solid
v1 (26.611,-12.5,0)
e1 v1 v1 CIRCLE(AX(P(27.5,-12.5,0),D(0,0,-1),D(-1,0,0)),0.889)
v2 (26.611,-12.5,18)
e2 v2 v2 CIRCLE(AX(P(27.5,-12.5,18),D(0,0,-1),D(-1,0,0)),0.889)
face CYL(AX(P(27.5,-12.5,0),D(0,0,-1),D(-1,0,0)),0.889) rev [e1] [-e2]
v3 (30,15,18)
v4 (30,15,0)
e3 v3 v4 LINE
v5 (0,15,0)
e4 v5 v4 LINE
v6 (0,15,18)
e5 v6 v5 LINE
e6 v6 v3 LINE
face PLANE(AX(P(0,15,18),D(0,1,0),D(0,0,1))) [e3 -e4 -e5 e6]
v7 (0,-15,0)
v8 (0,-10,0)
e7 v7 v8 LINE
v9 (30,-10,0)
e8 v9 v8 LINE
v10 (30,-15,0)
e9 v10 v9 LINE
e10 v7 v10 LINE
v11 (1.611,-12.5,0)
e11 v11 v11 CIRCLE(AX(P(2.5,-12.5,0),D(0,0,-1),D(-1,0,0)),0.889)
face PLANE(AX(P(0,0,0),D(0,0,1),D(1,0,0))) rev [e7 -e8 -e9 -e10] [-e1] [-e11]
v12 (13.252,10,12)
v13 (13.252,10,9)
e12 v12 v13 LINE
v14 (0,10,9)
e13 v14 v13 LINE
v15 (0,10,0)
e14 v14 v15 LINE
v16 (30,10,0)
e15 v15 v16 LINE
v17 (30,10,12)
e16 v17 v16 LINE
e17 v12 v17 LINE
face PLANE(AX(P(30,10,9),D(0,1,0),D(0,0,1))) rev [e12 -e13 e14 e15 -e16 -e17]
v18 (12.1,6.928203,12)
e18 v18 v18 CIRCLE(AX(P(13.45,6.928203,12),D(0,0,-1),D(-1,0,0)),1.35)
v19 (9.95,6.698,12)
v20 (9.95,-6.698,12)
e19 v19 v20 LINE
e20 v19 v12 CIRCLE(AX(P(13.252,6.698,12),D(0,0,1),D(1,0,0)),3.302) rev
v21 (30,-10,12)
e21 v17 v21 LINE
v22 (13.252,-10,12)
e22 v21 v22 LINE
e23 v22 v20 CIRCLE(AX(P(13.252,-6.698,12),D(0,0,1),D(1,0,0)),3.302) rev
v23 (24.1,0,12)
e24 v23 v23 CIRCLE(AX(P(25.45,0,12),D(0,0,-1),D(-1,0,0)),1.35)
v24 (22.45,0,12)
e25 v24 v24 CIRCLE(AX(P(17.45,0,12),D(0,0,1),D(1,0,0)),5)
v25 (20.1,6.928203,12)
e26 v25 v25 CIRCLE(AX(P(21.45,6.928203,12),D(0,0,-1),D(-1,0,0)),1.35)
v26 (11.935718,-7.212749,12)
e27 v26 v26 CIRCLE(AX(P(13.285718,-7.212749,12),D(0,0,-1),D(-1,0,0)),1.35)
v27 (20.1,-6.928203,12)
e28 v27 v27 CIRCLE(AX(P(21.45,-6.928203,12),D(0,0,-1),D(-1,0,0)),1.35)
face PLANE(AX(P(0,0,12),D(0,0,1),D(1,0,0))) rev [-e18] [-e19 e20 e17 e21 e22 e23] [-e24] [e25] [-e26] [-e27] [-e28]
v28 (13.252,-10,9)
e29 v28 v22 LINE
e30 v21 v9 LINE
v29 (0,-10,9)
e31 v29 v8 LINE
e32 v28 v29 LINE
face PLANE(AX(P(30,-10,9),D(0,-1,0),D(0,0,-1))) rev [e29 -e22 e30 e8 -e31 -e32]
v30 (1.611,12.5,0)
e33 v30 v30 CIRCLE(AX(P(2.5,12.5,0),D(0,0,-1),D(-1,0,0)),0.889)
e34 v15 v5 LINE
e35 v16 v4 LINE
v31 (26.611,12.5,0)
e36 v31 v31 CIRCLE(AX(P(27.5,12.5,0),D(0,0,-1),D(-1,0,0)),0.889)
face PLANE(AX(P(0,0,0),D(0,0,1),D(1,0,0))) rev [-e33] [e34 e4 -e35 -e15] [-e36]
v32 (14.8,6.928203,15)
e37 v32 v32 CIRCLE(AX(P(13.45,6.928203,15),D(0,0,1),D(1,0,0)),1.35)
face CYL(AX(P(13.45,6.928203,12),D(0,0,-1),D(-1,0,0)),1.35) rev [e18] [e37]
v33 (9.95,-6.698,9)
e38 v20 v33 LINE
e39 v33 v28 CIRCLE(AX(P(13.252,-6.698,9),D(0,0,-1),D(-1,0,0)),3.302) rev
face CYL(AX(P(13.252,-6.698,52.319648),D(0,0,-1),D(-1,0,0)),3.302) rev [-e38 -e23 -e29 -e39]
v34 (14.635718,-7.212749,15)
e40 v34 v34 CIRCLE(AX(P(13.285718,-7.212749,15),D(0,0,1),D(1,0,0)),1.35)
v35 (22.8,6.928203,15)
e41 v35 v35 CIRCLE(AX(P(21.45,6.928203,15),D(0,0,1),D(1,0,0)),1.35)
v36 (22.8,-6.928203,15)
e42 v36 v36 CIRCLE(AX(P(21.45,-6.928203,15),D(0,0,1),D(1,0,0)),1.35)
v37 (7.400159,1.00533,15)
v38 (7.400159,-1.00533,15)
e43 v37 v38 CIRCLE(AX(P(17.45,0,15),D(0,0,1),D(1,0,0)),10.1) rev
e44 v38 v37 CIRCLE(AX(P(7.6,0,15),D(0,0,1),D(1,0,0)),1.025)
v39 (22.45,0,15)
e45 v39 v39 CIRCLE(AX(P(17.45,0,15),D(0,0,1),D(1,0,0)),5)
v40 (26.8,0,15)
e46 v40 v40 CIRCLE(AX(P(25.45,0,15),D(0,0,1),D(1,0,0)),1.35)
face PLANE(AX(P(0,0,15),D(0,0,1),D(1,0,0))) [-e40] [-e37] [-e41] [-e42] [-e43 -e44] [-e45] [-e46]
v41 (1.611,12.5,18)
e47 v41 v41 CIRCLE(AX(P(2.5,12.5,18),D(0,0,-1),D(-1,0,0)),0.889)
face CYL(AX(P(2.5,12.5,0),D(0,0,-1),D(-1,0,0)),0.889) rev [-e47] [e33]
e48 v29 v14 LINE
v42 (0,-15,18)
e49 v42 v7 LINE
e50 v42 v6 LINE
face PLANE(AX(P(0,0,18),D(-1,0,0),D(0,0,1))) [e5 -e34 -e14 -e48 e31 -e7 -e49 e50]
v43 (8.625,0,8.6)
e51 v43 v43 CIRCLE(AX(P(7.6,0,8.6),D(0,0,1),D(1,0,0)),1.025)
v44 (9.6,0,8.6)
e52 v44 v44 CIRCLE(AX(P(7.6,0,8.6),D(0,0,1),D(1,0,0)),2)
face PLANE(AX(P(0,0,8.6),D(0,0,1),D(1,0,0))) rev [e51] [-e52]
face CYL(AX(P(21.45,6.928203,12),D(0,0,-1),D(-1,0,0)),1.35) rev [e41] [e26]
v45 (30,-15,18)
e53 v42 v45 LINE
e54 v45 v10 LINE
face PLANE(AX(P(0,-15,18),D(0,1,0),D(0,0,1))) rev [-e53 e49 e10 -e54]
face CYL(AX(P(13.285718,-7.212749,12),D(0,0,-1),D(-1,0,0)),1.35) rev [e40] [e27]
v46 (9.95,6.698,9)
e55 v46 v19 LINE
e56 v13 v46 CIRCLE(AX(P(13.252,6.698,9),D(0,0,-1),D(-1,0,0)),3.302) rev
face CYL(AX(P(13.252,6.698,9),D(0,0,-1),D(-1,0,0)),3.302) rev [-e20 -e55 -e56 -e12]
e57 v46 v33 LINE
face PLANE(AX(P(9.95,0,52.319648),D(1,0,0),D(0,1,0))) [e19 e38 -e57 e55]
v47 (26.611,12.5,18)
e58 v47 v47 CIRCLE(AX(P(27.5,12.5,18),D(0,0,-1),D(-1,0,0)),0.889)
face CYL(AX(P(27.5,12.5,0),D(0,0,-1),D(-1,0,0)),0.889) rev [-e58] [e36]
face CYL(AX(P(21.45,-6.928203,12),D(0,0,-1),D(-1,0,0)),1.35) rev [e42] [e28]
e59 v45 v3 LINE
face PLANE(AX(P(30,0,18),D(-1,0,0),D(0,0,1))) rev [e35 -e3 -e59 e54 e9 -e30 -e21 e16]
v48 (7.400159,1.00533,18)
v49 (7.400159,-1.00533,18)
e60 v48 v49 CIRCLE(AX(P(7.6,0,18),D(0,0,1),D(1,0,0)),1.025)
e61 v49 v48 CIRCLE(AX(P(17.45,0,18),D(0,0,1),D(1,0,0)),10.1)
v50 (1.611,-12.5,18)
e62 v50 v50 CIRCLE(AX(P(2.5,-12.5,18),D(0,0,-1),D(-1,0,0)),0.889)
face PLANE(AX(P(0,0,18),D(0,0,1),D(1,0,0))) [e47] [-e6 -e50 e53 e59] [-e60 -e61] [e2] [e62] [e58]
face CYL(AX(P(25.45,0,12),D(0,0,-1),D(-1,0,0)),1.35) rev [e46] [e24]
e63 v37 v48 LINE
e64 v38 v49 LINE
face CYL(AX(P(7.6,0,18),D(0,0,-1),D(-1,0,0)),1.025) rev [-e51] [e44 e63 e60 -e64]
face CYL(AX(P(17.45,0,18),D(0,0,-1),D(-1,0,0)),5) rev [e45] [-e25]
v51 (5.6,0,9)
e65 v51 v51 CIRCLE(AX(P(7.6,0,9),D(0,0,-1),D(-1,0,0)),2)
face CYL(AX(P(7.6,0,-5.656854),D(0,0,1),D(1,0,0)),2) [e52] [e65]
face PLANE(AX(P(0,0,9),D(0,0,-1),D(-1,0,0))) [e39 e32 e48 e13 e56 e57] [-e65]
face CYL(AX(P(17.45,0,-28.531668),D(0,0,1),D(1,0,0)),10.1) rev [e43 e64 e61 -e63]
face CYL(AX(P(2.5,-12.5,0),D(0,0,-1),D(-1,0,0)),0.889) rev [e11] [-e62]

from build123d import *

# Parameters (mm, degrees)
SKETCH2_W              = 30
SKETCH2_H              = 30
SKETCH2_R              = 5
SKETCH2_R_2            = 1.025
BOSS_EXTRUDE1_DEPTH    = 18
SKETCH3_W              = 30
SKETCH3_H              = 20
CUT_EXTRUDE1_DEPTH     = 9
F_2_56_TAPPED_HOLE1_D  = 1.778
CUT_EXTRUDE2_START     = -3
SKETCH8_R              = 10.1
SKETCH8_R_2            = 5
SKETCH8_R_3            = 1.025
CUT_EXTRUDE2_DEPTH     = 3
BOSS_EXTRUDE2_START    = 0.4
SKETCH9_R              = 2
SKETCH9_R_2            = 1.025
BOSS_EXTRUDE2_DEPTH    = 0.4
SKETCH10_W             = 20.050000056
SKETCH10_H             = 20
CUT_EXTRUDE3_DEPTH     = 2.999999892
FILLET1_START          = 9
FILLET1_DEPTH          = 4
M2_5_CLEARANCE_HOLE1_D = 2.7


with BuildPart() as part:
    # Sketch2 → Boss-Extrude1 (new body)
    # profile 1 of 2: a face of its own
    with BuildSketch(Plane.XY):
        with Locations((15, 0)):
            Rectangle(SKETCH2_W, SKETCH2_H)
        with Locations((17.449999944, 0)):
            Circle(SKETCH2_R, mode=Mode.SUBTRACT)
        with Locations((7.599999986, 0)):
            Circle(SKETCH2_R_2, mode=Mode.SUBTRACT)
    # profile 2 of 2: a face of its own
    with BuildSketch(Plane.XY):
        with BuildLine():
            ThreePointArc((22.449999944, 0), (20.98553385, -3.535533906), (17.449999944, -5))
            Line((17.449999944, -5), (30, -5))
            Line((30, -5), (30, 5))
            Line((30, 5), (17.449999944, 5))
            ThreePointArc((17.449999944, 5), (20.98553385, 3.535533906), (22.449999944, 0))
        make_face()
    extrude(amount=BOSS_EXTRUDE1_DEPTH)

    # Sketch3 → Cut-Extrude1 (cut)
    with BuildSketch(Plane(origin=(0, 0, 0), x_dir=(-1, 0, 0), z_dir=(0, 0, -1))):
        with Locations((-15, 0)):
            Rectangle(SKETCH3_W, SKETCH3_H)
    extrude(amount=-CUT_EXTRUDE1_DEPTH, mode=Mode.SUBTRACT)

    # #2-56 Tapped Hole1 (through all)
    with Locations(Plane(origin=(0, 0, 0), x_dir=(-1, 0, 0), z_dir=(0, 0, -1))):
        with Locations((-27.5, 12.5), (-27.5, -12.5), (-2.5, -12.5), (-2.5, 12.5)):
            Hole(F_2_56_TAPPED_HOLE1_D / 2)

    # Sketch8 → Cut-Extrude2 (cut)
    # profile 1 of 2: a face of its own
    with BuildSketch(Plane.XY.offset(18).offset(CUT_EXTRUDE2_START)):
        with Locations((17.449999944, 0)):
            Circle(SKETCH8_R)
        with Locations(Location((17.449999944, 0, 0), (0, 0, 180))):
            Circle(SKETCH8_R_2, mode=Mode.SUBTRACT)
    # profile 2 of 2: a face of its own
    with BuildSketch(Plane.XY.offset(18).offset(CUT_EXTRUDE2_START)):
        with Locations(Location((7.599999986, 0, 0), (0, 0, 180))):
            Circle(SKETCH8_R_3)
    extrude(amount=CUT_EXTRUDE2_DEPTH, mode=Mode.SUBTRACT)

    # Sketch9 → Boss-Extrude2 (add)
    with BuildSketch(Plane(origin=(0, 0, 9), x_dir=(-1, 0, 0), z_dir=(0, 0, -1)).offset(BOSS_EXTRUDE2_START)):
        with Locations(Location((-7.599999986, 0, 0), (0, 0, 180))):
            Circle(SKETCH9_R)
        with Locations(Location((-7.599999986, 0, 0), (0, 0, 78.757190581))):
            Circle(SKETCH9_R_2, mode=Mode.SUBTRACT)
    extrude(amount=-BOSS_EXTRUDE2_DEPTH)

    # Sketch10 → Cut-Extrude3 (cut)
    with BuildSketch(Plane(origin=(0, 0, 9), x_dir=(-1, 0, 0), z_dir=(0, 0, -1))):
        with Locations((-19.974999972, 0)):
            Rectangle(SKETCH10_W, SKETCH10_H)
    extrude(amount=-CUT_EXTRUDE3_DEPTH, mode=Mode.SUBTRACT)

    # Fillet1: read off the stored shape, not the designer's step
    # Fillet1 outline → Fillet1 (add)
    with BuildSketch(Plane.XY.offset(FILLET1_START)):
        with BuildLine():
            Line((9.949999944, -10), (13.251999944, -10))
            ThreePointArc((13.251999944, -10), (10.917133353, -9.032866591), (9.949999944, -6.698))
            Line((9.949999944, -6.698), (9.949999944, -10))
        make_face()
        with BuildLine():
            Line((9.949999944, 10), (9.949999944, 6.698))
            ThreePointArc((9.949999944, 6.698), (10.917133353, 9.032866591), (13.251999944, 10))
            Line((13.251999944, 10), (9.949999944, 10))
        make_face()
    extrude(amount=FILLET1_DEPTH)

    # M2.5 Clearance Hole1 (through all)
    with Locations(Plane(origin=(0, 0, 11.999999892), x_dir=(-1, 0, 0), z_dir=(0, 0, -1))):
        with Locations((-21.449999944, 6.92820323), (-13.449999944, 6.92820323), (-13.285717643, -7.212748522), (-21.449999944, -6.92820323), (-25.449999944, 0)):
            Hole(M2_5_CLEARANCE_HOLE1_D / 2)


solid = part.part
